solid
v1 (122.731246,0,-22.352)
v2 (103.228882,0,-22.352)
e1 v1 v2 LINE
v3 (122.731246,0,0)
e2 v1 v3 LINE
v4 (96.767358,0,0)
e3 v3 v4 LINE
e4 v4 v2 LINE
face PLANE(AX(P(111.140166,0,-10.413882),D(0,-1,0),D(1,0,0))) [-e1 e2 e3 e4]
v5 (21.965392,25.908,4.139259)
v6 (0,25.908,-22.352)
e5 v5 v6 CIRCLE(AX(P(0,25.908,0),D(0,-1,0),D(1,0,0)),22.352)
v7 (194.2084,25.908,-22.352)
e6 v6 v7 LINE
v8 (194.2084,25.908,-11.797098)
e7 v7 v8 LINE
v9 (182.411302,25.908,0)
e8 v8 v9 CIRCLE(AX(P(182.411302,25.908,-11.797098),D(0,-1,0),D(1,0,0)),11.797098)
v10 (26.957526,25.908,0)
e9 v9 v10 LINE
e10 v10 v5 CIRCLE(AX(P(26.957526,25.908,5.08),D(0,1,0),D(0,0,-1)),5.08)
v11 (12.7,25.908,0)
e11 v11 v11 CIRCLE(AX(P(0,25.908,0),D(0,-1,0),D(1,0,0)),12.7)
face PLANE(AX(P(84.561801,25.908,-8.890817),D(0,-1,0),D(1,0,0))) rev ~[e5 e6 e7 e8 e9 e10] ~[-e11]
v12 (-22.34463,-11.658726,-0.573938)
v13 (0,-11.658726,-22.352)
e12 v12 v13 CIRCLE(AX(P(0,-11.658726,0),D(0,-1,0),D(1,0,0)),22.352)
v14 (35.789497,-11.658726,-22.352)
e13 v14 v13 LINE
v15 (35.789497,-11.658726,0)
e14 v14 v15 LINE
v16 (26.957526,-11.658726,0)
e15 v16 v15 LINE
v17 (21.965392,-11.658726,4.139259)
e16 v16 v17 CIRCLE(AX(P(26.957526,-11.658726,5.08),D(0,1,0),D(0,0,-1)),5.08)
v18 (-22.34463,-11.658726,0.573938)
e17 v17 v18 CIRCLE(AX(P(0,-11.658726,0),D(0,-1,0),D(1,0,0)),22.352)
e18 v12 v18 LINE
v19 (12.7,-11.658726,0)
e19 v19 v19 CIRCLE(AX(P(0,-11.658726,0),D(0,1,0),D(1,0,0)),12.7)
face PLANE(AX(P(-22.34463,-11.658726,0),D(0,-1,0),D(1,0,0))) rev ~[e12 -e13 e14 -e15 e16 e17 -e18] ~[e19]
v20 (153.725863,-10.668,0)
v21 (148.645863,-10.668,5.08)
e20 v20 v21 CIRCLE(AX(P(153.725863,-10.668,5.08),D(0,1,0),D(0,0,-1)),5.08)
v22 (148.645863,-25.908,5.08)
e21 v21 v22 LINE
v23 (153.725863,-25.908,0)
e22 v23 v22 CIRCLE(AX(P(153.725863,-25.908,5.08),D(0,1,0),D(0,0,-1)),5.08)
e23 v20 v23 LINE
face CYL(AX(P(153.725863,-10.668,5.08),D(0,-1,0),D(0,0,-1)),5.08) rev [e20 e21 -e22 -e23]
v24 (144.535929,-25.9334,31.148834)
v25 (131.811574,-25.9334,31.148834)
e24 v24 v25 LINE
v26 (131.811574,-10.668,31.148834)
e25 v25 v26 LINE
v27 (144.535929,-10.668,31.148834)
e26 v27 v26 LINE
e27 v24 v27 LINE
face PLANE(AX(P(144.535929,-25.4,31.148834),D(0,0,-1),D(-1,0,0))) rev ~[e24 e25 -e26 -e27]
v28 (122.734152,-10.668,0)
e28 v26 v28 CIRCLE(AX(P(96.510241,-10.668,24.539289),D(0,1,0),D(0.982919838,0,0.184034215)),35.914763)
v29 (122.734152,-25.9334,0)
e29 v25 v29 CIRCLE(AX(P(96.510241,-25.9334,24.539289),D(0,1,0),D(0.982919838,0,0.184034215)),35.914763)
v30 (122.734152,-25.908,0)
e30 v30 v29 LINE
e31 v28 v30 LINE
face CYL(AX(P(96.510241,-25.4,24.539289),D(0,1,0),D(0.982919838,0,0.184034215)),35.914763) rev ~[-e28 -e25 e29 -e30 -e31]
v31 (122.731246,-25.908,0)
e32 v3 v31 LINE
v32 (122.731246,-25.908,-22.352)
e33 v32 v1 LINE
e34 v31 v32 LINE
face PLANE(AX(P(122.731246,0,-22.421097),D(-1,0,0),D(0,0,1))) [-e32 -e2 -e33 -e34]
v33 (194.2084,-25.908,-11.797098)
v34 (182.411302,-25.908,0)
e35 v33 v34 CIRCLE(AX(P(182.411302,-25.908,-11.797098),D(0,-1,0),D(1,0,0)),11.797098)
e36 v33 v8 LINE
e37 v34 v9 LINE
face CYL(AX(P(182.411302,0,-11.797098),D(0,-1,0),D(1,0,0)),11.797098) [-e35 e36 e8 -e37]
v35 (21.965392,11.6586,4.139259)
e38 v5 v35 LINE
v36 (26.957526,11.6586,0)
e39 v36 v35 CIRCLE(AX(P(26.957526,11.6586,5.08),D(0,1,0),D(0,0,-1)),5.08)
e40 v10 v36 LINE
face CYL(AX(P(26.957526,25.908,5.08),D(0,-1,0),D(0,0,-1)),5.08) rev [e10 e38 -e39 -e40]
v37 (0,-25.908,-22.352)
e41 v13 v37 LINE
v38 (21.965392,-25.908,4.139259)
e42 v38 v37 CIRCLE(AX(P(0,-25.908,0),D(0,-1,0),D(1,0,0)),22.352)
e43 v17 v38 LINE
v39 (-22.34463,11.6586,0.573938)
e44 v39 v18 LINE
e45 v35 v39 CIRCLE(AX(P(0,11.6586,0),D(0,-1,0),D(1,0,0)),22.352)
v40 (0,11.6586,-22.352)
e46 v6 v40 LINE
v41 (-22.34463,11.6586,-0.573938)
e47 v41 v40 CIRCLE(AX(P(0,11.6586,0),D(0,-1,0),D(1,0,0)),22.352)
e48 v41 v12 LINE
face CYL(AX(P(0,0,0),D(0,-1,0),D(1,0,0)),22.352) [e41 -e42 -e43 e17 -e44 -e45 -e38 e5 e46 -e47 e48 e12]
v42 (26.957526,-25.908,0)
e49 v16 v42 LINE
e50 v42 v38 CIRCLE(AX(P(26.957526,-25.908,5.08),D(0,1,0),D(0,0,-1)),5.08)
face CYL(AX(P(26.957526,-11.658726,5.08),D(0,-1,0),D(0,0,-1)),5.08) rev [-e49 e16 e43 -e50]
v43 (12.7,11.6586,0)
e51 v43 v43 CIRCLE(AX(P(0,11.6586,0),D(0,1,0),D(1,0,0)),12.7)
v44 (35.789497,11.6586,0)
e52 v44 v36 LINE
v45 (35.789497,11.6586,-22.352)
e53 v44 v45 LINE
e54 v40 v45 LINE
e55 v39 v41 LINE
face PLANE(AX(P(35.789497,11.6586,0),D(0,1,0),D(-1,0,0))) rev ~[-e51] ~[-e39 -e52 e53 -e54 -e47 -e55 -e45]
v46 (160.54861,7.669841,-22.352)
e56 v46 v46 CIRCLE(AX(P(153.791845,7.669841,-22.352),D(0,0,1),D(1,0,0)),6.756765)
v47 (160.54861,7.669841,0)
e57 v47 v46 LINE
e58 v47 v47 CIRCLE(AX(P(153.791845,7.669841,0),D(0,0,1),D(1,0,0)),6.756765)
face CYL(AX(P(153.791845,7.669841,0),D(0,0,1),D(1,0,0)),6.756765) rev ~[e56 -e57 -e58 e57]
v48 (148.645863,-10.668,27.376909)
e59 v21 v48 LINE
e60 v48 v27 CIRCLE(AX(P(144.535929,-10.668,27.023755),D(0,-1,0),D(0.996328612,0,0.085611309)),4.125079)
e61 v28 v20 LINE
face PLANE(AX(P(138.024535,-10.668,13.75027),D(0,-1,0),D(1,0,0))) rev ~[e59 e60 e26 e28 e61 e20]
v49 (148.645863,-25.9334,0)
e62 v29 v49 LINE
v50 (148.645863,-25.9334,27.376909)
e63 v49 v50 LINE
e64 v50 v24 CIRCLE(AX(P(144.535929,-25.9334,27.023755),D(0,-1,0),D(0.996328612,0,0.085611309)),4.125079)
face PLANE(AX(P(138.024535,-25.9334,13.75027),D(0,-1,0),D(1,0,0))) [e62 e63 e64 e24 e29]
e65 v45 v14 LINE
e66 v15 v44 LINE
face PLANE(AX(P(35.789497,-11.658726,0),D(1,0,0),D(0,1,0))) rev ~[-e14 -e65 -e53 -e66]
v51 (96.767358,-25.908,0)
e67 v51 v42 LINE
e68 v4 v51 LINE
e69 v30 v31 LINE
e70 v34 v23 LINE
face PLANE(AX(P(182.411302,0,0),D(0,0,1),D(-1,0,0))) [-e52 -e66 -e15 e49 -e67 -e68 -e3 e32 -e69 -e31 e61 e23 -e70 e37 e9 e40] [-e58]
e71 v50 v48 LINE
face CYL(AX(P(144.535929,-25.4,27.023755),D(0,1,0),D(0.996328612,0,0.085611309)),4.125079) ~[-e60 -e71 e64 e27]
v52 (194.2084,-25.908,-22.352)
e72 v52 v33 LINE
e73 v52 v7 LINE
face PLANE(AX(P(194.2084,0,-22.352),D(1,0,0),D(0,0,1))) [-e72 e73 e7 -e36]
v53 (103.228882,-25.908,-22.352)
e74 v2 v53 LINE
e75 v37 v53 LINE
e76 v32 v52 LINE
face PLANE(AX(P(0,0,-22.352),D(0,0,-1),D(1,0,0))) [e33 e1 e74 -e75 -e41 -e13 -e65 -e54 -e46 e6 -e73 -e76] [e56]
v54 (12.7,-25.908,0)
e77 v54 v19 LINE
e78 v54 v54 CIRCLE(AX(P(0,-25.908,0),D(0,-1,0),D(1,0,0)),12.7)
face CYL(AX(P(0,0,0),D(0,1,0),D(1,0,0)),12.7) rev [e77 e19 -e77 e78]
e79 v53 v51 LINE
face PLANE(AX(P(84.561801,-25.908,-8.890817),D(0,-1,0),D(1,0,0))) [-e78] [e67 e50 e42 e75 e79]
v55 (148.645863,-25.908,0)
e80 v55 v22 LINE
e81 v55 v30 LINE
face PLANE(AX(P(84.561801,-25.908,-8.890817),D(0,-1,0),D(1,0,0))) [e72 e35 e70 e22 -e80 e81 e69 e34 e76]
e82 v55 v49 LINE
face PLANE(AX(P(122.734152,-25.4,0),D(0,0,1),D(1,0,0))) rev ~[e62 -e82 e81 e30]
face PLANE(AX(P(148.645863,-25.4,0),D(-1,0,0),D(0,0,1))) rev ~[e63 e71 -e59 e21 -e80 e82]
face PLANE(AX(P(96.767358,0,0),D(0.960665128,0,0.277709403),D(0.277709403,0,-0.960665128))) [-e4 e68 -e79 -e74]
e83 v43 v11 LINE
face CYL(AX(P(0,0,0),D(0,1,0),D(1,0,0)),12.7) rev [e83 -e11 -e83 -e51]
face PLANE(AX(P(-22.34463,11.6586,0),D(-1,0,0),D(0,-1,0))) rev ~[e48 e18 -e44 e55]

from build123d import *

# Parameters (mm, degrees)
F0_R          = 12.7
F4_DEPTH      = 25.908
F5_DEPTH      = 14.732
F5_DEPTH_BACK = 0.5334
F6_DEPTH      = 51.816
F7_R          = 6.7567647924
F8_DEPTH      = 76.454
F10_DEPTH     = 115.57
F11_R         = 5.08


with BuildPart() as f4:
    # F0 (on Front) → F4 (new body, symmetric)
    with BuildSketch(Plane.XZ):
        with BuildLine():
            Line((182.4113020967, 0), (22.352, 0))
            ThreePointArc((22.352, 0), (-15.8052507731, 15.8052507731), (0, -22.352))
            Line((0, -22.352), (194.2084, -22.352))
            Line((194.2084, -22.352), (194.2084, -11.7970979033))
            ThreePointArc((194.2084, -11.7970979033), (190.7531100225, -3.4552899775), (182.4113020967, 0))
        make_face()
        Circle(F0_R, mode=Mode.SUBTRACT)
    extrude(amount=F4_DEPTH, both=True)

    # F3 (on offset) → F5 (join, two sides)
    with BuildSketch(Plane.XZ.offset(25.4)) as f5_sk:
        with BuildLine():
            ThreePointArc((131.8115741014, 31.148834154), (130.990690219, 14.4909643817), (122.7341517806, 0))
            Line((122.7341517806, 0), (148.645862937, 0))
            Line((148.645862937, 0), (148.645862937, 27.3769088089))
            ThreePointArc((148.645862937, 27.3769088089), (147.3251483028, 30.062921432), (144.5359289646, 31.148834154))
            Line((144.5359289646, 31.148834154), (131.8115741014, 31.148834154))
        make_face()
    extrude(amount=-F5_DEPTH)
    extrude(f5_sk.sketch, amount=F5_DEPTH_BACK)

    # F1 (on Top) → F6 (cut, symmetric)
    with BuildSketch(Plane.XY):
        Polygon((-22.3446302116, 11.6586), (-22.3446302116, 0), (-22.3446302116, -11.6587262601), (35.7894971967, -11.6587262601), (35.7894971967, 11.6586), align=None)
    extrude(amount=F6_DEPTH, both=True, mode=Mode.SUBTRACT)

    # F7 (on Top) → F8 (cut)
    with BuildSketch(Plane.XY):
        with Locations((153.7918448448, 7.6698409393)):
            Circle(F7_R)
    extrude(amount=-F8_DEPTH, mode=Mode.SUBTRACT)

    # F9 (on Front) → F10 (cut)
    with BuildSketch(Plane.XZ):
        Polygon((122.7312460542, -22.4210973829), (122.7312460542, 0), (96.7673584819, 0), (103.2488569617, -22.4210973829), align=None)
    extrude(amount=F10_DEPTH, mode=Mode.SUBTRACT)

    # F11
    f11_edges = [f4.edges().sort_by_distance(p)[0] for p in [
        (22.352, -18.783363, 0),
        (22.352, 18.7833, 0),
        (148.645863, -18.288, 0),
    ]]
    fillet(f11_edges, radius=F11_R)


solid = f4.part
